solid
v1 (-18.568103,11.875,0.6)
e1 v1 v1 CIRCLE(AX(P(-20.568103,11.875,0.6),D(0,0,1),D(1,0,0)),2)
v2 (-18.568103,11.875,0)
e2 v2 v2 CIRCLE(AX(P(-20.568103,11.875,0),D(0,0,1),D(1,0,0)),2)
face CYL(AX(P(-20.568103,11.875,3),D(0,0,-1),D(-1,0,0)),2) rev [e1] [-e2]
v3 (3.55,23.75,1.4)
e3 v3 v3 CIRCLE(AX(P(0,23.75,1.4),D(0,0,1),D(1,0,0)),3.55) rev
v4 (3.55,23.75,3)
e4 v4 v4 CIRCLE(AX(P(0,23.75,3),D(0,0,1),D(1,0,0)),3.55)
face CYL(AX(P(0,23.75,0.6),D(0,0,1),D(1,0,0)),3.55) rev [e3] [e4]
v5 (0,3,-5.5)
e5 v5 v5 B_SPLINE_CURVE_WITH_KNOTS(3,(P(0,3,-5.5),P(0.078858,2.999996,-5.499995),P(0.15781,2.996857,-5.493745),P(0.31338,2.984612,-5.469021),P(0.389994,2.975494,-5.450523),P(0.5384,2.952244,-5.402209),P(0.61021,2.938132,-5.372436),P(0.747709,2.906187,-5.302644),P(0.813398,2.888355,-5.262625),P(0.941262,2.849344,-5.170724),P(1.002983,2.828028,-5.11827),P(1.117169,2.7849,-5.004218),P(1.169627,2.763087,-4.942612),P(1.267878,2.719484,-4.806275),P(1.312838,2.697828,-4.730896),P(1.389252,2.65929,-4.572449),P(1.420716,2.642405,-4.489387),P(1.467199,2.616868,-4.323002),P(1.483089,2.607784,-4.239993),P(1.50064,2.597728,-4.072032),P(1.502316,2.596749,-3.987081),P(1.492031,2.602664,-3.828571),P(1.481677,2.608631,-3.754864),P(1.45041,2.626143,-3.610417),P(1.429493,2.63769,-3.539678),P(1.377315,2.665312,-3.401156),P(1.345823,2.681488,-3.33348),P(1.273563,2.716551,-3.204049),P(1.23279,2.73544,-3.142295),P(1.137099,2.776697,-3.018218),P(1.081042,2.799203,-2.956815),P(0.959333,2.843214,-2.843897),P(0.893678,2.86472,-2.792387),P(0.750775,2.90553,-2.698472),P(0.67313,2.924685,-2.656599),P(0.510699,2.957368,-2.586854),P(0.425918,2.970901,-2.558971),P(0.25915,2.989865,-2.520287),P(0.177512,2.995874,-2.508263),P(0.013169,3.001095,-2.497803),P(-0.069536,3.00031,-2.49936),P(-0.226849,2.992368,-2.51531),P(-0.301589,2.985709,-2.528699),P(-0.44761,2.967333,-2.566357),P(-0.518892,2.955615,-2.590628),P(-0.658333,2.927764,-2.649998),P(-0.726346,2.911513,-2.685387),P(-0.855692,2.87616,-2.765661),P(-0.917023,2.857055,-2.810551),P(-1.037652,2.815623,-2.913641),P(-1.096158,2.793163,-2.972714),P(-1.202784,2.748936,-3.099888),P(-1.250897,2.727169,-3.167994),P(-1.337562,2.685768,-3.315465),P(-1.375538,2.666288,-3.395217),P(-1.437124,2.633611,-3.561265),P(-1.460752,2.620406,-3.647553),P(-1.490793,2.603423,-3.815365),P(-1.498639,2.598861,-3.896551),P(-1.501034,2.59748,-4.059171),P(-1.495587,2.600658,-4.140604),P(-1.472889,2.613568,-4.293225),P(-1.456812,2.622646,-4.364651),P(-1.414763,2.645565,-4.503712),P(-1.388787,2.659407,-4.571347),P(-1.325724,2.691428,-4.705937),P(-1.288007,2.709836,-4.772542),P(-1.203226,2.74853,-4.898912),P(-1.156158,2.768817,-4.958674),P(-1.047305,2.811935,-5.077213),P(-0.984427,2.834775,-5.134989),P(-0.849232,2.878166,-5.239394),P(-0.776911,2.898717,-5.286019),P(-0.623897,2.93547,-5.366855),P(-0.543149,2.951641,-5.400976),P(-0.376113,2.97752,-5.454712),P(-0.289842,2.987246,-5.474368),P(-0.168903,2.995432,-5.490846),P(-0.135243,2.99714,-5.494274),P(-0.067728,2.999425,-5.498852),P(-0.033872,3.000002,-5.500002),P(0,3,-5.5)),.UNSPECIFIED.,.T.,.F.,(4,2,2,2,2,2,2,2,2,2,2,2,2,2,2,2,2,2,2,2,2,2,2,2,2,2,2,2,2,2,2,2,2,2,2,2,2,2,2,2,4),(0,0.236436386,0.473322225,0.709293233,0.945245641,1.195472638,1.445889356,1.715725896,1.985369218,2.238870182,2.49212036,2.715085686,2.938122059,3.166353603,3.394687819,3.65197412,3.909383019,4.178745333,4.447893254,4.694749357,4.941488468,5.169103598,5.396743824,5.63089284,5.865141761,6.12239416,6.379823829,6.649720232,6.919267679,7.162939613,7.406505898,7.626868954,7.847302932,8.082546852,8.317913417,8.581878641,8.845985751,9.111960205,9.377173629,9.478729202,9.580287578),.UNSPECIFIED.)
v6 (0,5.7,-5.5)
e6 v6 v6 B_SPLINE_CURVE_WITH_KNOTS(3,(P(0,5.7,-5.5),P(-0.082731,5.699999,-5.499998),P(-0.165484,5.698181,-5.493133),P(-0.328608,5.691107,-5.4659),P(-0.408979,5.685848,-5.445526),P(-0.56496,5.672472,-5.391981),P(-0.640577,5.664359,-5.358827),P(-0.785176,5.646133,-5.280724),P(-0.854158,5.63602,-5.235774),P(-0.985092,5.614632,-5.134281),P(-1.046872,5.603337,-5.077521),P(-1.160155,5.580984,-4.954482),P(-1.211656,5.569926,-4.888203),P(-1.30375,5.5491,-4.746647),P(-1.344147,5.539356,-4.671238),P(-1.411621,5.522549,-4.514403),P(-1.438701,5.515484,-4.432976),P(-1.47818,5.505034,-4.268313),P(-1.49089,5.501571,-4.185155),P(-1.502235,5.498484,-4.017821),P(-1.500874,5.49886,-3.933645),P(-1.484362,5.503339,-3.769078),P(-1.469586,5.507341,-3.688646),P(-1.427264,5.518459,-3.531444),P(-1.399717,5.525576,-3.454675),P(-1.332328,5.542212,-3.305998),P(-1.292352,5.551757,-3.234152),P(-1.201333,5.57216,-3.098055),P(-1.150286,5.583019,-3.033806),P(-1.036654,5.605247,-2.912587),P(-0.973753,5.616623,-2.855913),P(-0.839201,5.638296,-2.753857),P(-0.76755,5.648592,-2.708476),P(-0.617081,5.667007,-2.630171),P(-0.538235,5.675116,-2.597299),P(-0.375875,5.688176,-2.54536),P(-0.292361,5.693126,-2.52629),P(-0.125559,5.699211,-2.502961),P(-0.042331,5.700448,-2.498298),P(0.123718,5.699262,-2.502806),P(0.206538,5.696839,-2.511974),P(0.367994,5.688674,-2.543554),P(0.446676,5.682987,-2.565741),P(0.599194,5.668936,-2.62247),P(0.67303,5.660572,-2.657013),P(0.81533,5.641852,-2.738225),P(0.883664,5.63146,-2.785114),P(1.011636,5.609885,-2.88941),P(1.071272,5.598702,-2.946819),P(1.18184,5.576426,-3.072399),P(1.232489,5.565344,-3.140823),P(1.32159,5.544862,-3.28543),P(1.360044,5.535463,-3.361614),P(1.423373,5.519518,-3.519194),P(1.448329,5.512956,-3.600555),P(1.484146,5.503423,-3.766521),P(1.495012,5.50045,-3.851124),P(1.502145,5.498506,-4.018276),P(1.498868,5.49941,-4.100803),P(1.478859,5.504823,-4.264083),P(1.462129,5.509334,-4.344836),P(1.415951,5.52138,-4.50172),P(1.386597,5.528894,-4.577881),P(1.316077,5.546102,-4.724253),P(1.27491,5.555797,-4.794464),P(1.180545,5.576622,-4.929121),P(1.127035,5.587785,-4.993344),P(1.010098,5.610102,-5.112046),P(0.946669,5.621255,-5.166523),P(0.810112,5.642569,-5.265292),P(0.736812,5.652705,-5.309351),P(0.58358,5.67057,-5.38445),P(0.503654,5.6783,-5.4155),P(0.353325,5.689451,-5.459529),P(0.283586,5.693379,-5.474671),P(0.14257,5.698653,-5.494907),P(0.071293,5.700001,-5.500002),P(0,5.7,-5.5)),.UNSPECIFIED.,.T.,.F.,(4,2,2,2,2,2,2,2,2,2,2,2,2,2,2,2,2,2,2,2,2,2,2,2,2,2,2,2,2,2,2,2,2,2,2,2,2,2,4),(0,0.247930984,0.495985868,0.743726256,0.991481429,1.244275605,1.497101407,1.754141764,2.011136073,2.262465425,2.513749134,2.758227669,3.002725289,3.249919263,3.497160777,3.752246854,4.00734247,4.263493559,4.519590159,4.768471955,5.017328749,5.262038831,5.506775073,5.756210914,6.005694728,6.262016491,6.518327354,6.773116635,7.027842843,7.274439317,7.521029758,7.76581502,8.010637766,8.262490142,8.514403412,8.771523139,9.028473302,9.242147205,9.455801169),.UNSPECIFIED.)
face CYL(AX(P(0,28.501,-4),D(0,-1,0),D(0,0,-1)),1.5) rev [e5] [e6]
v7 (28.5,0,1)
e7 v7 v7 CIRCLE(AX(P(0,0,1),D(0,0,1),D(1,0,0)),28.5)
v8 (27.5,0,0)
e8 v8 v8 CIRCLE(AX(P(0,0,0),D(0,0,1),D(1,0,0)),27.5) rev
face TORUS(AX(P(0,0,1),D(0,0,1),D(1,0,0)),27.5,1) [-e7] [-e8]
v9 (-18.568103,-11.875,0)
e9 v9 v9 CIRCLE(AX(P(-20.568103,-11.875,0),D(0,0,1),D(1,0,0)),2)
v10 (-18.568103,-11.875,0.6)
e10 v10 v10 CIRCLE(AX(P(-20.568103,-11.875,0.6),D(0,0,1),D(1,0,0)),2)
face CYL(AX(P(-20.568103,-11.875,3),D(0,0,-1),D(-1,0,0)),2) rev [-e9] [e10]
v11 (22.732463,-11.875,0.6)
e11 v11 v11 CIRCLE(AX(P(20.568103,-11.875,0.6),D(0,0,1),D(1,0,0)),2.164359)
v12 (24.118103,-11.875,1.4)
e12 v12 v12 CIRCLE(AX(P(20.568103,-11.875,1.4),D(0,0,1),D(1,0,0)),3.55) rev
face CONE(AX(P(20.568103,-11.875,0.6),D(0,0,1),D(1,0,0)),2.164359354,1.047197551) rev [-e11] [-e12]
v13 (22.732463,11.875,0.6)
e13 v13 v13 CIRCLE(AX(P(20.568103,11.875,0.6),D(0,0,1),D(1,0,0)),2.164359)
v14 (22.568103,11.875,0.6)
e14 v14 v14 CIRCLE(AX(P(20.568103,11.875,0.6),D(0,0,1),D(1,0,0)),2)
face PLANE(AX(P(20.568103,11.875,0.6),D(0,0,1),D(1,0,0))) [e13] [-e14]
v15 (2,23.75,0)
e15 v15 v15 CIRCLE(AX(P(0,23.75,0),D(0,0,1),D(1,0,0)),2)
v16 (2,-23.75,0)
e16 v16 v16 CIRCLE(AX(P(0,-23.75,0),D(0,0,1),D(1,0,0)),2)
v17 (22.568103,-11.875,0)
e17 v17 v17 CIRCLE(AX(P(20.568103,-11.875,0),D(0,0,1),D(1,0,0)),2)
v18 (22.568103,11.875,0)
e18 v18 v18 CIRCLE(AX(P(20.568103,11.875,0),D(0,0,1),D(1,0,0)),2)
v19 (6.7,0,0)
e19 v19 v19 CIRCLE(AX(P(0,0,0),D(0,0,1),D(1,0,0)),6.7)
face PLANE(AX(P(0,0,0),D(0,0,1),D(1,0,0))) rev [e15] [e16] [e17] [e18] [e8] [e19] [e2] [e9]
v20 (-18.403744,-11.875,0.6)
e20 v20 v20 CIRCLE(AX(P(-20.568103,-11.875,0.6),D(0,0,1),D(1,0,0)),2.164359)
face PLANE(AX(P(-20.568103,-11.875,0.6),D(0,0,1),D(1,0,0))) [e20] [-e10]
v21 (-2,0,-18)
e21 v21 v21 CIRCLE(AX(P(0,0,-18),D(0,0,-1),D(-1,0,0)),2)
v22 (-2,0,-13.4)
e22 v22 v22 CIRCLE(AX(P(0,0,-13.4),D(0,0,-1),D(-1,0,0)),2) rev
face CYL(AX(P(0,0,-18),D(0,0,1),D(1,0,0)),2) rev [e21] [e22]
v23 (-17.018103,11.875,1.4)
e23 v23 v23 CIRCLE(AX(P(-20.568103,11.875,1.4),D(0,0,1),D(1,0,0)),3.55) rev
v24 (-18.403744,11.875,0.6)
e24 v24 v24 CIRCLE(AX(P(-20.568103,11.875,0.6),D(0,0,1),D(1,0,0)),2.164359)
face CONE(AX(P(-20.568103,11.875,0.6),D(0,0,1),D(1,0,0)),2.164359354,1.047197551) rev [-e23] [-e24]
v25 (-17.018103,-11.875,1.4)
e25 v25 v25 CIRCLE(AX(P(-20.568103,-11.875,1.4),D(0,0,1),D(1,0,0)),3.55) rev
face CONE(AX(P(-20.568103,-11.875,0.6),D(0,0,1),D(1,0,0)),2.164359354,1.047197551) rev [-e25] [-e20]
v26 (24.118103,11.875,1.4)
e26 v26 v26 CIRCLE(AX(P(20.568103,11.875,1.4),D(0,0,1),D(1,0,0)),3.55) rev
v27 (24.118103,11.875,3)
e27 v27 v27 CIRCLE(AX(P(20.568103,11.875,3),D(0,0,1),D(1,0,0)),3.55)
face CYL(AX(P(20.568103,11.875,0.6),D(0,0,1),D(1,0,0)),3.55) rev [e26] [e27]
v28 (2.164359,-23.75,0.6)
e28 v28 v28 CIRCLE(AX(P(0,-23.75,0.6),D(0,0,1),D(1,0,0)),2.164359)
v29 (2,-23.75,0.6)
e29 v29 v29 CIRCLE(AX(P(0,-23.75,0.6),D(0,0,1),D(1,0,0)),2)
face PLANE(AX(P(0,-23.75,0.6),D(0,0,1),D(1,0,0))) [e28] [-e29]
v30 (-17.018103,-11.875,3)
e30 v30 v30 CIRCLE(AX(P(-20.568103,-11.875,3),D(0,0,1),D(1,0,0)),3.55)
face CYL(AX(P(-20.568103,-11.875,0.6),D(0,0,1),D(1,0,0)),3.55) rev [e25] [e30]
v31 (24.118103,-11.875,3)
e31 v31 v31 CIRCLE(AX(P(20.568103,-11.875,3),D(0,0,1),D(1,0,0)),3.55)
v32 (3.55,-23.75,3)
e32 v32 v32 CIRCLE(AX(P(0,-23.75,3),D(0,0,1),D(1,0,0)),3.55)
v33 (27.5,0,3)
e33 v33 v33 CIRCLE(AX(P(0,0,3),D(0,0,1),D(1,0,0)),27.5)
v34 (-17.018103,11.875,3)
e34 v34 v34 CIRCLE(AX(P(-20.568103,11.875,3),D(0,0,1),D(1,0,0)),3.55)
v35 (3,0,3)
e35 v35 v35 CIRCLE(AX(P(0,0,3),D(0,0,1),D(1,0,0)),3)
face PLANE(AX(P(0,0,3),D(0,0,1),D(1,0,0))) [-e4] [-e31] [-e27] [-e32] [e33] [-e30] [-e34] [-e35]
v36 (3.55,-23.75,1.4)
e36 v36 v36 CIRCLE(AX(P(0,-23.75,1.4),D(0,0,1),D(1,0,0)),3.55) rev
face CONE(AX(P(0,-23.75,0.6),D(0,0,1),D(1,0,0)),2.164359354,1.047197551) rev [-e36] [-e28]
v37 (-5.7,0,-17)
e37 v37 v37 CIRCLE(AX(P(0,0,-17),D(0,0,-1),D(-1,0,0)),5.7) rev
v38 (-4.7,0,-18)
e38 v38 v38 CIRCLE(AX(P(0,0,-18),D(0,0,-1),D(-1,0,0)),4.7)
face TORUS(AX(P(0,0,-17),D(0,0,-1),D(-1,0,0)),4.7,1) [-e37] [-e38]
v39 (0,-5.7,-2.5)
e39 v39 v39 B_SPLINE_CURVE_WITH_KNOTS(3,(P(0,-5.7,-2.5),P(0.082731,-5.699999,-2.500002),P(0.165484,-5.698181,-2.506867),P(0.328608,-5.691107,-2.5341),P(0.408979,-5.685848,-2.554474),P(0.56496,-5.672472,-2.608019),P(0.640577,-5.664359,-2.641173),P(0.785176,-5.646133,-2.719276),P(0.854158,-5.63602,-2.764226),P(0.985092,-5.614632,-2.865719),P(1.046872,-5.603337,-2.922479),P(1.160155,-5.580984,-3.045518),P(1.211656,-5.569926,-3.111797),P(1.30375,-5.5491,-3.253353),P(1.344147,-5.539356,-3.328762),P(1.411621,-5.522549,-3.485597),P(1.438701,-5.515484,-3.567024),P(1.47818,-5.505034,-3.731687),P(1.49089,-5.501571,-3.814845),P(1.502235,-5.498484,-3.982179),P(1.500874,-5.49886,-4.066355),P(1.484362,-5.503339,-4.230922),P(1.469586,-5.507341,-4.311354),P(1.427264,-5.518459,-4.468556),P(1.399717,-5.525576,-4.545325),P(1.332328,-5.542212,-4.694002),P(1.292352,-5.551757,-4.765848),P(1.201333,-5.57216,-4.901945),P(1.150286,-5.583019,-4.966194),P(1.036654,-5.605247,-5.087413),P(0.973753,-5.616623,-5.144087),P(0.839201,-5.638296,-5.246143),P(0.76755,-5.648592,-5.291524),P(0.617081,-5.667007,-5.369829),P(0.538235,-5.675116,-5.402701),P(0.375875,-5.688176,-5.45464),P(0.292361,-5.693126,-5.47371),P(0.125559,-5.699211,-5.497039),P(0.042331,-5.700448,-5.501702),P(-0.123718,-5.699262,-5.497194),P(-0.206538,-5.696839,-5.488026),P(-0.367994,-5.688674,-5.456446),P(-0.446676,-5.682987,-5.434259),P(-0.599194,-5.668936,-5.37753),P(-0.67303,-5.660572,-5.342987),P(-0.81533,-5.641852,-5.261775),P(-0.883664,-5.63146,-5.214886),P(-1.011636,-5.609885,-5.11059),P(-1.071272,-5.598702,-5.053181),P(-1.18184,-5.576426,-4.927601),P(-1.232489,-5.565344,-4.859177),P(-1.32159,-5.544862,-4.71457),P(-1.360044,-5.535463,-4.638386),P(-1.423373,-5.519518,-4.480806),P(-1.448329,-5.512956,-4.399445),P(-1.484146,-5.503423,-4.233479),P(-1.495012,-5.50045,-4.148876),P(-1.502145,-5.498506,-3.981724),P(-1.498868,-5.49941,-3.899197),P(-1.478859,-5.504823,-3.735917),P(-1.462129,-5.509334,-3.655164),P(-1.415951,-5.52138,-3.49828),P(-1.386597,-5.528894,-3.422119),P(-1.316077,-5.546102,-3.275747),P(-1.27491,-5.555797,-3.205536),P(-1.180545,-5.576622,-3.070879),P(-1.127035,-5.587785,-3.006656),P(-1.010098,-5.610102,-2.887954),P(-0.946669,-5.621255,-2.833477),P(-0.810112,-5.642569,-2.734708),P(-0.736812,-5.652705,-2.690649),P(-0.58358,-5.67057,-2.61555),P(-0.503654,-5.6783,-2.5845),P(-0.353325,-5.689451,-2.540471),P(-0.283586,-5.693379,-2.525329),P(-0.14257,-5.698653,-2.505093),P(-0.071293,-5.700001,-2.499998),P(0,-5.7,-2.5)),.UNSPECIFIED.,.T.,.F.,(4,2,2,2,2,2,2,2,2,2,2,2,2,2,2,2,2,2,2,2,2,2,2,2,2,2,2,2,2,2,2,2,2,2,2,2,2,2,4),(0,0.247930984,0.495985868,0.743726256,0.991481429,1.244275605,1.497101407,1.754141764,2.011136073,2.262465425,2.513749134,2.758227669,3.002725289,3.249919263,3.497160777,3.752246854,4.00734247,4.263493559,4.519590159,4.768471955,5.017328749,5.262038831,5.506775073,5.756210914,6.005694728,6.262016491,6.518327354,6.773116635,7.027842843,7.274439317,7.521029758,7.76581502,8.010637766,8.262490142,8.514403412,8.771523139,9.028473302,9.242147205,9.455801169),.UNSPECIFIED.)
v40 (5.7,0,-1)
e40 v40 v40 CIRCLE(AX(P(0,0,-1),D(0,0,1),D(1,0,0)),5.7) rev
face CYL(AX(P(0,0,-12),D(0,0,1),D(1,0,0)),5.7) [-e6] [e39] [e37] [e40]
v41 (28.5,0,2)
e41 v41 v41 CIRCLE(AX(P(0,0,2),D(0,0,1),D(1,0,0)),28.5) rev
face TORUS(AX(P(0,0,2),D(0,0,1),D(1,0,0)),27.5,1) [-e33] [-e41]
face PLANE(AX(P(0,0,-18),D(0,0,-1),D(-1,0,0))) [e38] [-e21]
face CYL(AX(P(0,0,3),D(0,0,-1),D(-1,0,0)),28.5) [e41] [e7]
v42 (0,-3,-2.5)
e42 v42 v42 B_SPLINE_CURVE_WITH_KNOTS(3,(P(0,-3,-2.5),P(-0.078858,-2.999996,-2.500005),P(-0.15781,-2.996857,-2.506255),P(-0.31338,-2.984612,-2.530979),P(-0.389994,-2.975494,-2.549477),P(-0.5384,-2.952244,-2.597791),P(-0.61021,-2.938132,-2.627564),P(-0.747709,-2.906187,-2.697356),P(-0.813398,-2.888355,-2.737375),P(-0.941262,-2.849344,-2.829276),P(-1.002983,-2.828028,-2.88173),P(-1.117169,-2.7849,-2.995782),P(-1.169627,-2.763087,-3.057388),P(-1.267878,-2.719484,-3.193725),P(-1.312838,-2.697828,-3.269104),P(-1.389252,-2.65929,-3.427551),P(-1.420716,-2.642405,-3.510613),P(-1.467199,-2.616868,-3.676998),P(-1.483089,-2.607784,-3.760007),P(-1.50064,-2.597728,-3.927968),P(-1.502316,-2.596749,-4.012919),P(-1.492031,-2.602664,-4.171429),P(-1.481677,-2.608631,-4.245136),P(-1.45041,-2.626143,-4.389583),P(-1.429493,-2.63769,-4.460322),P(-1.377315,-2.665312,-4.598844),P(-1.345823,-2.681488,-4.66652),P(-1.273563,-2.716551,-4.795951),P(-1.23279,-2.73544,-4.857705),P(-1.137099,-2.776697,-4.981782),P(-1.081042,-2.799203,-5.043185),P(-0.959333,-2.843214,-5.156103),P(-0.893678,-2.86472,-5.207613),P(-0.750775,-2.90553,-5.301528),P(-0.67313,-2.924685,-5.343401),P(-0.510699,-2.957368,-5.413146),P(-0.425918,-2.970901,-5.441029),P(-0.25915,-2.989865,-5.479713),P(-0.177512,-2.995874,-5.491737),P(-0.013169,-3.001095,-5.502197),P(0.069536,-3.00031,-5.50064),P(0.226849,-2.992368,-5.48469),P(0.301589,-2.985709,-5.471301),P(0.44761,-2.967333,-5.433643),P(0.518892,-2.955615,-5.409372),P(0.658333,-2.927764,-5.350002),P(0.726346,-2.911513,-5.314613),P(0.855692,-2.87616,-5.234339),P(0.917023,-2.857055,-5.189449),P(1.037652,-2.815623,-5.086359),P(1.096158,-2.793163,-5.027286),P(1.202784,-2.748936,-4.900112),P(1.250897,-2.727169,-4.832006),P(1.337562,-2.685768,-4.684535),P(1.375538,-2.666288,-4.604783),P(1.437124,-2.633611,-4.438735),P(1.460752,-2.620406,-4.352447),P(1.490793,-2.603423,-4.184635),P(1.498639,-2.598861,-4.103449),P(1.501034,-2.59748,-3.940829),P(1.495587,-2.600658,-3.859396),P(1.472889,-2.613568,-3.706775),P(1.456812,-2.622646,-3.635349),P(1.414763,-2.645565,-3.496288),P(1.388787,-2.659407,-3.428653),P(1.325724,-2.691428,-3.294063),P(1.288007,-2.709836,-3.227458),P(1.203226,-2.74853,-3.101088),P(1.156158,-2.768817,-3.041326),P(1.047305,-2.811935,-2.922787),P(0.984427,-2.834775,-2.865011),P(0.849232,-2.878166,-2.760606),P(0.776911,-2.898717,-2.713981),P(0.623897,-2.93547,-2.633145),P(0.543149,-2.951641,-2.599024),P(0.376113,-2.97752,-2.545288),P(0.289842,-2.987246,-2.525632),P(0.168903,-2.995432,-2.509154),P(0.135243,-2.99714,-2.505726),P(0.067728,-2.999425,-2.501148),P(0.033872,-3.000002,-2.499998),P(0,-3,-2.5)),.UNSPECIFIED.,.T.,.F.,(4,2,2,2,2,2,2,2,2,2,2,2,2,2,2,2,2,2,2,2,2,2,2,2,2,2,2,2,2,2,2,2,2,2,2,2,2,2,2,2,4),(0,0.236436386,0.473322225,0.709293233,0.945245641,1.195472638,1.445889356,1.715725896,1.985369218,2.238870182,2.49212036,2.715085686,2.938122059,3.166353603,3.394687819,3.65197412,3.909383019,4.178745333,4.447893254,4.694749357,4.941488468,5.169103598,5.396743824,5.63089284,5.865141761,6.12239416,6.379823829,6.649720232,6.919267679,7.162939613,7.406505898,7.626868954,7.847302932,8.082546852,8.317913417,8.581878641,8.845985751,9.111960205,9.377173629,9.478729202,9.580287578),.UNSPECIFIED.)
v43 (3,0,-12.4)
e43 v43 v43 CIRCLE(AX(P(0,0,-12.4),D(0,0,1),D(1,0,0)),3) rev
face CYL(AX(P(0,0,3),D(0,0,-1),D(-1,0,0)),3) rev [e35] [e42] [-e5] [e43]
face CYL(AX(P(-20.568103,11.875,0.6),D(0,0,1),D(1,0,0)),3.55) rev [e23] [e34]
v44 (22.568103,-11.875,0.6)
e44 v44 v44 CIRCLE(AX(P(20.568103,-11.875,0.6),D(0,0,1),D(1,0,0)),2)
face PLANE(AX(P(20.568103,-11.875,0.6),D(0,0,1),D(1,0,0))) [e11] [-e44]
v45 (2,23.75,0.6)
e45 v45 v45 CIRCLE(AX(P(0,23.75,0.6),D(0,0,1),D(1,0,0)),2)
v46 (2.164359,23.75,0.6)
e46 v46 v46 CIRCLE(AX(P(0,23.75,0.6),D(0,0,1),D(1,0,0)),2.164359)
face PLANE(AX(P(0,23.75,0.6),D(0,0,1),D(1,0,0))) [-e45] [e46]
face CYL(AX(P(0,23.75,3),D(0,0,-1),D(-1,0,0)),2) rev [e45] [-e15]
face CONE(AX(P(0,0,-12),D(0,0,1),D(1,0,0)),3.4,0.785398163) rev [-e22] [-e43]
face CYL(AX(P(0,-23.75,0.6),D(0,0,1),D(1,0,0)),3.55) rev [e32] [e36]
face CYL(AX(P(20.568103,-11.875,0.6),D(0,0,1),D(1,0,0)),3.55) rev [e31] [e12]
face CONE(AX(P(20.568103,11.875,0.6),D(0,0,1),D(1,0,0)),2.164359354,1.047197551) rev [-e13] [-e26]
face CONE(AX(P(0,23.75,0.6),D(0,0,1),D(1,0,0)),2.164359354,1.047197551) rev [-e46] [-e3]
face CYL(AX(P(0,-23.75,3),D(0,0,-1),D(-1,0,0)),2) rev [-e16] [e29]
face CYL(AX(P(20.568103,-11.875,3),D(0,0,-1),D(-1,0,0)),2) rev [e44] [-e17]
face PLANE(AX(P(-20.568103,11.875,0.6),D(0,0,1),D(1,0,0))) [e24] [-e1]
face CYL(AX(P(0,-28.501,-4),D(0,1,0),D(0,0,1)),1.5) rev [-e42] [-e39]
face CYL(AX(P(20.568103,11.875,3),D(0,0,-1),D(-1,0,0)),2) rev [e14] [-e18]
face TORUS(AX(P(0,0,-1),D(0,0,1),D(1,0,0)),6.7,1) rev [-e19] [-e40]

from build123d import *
from OCP.BRepFilletAPI import BRepFilletAPI_MakeChamfer

# Parameters (mm, degrees)
SKETCH1_R                      = 28.5
SKETCH1_R_2                    = 5.7
SKETCH1_R_3                    = 2
SKETCH1_R_4                    = 3
BOSS_EXTRUDE1_DEPTH            = 3
SKETCH2_R                      = 3.55
CUT_EXTRUDE1_DEPTH             = 2.4
BOSS_EXTRUDE2_START            = -12
SKETCH1_4_R                    = 5.7
SKETCH1_4_R_2                  = 3
BOSS_EXTRUDE2_DEPTH            = 12
BOSS_EXTRUDE3_START            = 6
SKETCH4_R                      = 5.7
SKETCH4_R_2                    = 2
BOSS_EXTRUDE3_DEPTH            = 6
CUT_EXTRUDE2_REACH             = 46.142
SKETCH3_R                      = 1.5
CUT_EXTRUDE2_DIRECTION_2_REACH = 46.142
FILLET1_R                      = 1
CHAMFER1_SIZE                  = 1.4
CHAMFER2_SIZE                  = 0.8
CHAMFER2_SIZE2                 = 1.385640646


with BuildPart() as part:
    # Sketch1 → Boss-Extrude1 (new body)
    # profile 1 of 2: a face of its own
    with BuildSketch(Plane(origin=(0, 0, 0), x_dir=(0, 1, 0), z_dir=(0, 0, 1))):
        with Locations(Location((0, 0, 0), (0, 0, 270))):
            Circle(SKETCH1_R)
        Circle(SKETCH1_R_2, mode=Mode.SUBTRACT)
        with Locations(Location((-23.75, 0, 0), (0, 0, 270))):
            Circle(SKETCH1_R_3, mode=Mode.SUBTRACT)
        with Locations(Location((-11.875, 20.56810334, 0), (0, 0, 270))):
            Circle(SKETCH1_R_3, mode=Mode.SUBTRACT)
        with Locations(Location((11.875, 20.56810334, 0), (0, 0, 270))):
            Circle(SKETCH1_R_3, mode=Mode.SUBTRACT)
        with Locations(Location((23.75, 0, 0), (0, 0, 270))):
            Circle(SKETCH1_R_3, mode=Mode.SUBTRACT)
        with Locations(Location((11.875, -20.56810334, 0), (0, 0, 270))):
            Circle(SKETCH1_R_3, mode=Mode.SUBTRACT)
        with Locations(Location((-11.875, -20.56810334, 0), (0, 0, 270))):
            Circle(SKETCH1_R_3, mode=Mode.SUBTRACT)
    # profile 2 of 2: a face of its own
    with BuildSketch(Plane(origin=(0, 0, 0), x_dir=(0, 1, 0), z_dir=(0, 0, 1))):
        Circle(SKETCH1_R_2)
        with Locations(Location((0, 0, 0), (0, 0, 270))):
            Circle(SKETCH1_R_4, mode=Mode.SUBTRACT)
    extrude(amount=BOSS_EXTRUDE1_DEPTH)

    # Sketch2 → Cut-Extrude1 (cut)
    with BuildSketch(Plane.XY.offset(3)):
        with Locations((-20.56810334, -11.875)):
            Circle(SKETCH2_R)
        with Locations((-20.56810334, 11.875)):
            Circle(SKETCH2_R)
        with Locations((0, 23.75)):
            Circle(SKETCH2_R)
        with Locations((20.56810334, 11.875)):
            Circle(SKETCH2_R)
        with Locations((20.56810334, -11.875)):
            Circle(SKETCH2_R)
        with Locations((0, -23.75)):
            Circle(SKETCH2_R)
    extrude(amount=-CUT_EXTRUDE1_DEPTH, mode=Mode.SUBTRACT)

    # Sketch1<4> → Boss-Extrude2 (add)
    with BuildSketch(Plane(origin=(0, 0, 0), x_dir=(0, 1, 0), z_dir=(0, 0, 1)).offset(BOSS_EXTRUDE2_START)):
        with Locations(Location((0, 0, 0), (0, 0, 270))):
            Circle(SKETCH1_4_R)
        with Locations(Location((0, 0, 0), (0, 0, 270))):
            Circle(SKETCH1_4_R_2, mode=Mode.SUBTRACT)
    extrude(amount=BOSS_EXTRUDE2_DEPTH)

    # Sketch4 → Boss-Extrude3 (add)
    with BuildSketch(Plane(origin=(0, 0, -12), x_dir=(1, 0, 0), z_dir=(0, 0, -1)).offset(BOSS_EXTRUDE3_START)):
        Circle(SKETCH4_R)
        with Locations(Location((0, 0, 0), (0, 0, 180))):
            Circle(SKETCH4_R_2, mode=Mode.SUBTRACT)
    extrude(amount=-BOSS_EXTRUDE3_DEPTH)

    # Sketch3 → Cut-Extrude2 (cut, up to next)
    with BuildSketch(Plane(origin=(0, 0, 0), x_dir=(-1, 0, 0), z_dir=(0, 1, 0)), mode=Mode.PRIVATE) as cut_extrude2_sk1:
        with Locations(Location((0, -4, 0), (0, 0, 90))):
            Circle(SKETCH3_R)
    cut_extrude2_tool1 = extrude(cut_extrude2_sk1.sketch, amount=-CUT_EXTRUDE2_REACH, mode=Mode.PRIVATE) & part.part
    add(cut_extrude2_tool1.solids().sort_by_distance((0, 0, -4))[0], mode=Mode.SUBTRACT)

    # Sketch3 → Cut-Extrude2 direction 2 (cut, up to next)
    with BuildSketch(Plane(origin=(0, 0, 0), x_dir=(-1, 0, 0), z_dir=(0, 1, 0)), mode=Mode.PRIVATE) as cut_extrude2_direction_2_sk1:
        with Locations(Location((0, -4, 0), (0, 0, 90))):
            Circle(SKETCH3_R)
    cut_extrude2_direction_2_tool1 = extrude(cut_extrude2_direction_2_sk1.sketch, amount=CUT_EXTRUDE2_DIRECTION_2_REACH, mode=Mode.PRIVATE) & part.part
    add(cut_extrude2_direction_2_tool1.solids().sort_by_distance((0, 0, -4))[0], mode=Mode.SUBTRACT)

    # Fillet1
    fillet1_edges = [part.edges().sort_by_distance(p)[0] for p in [
        (-28.5, 0, 0),
        (-28.5, 0, 3),
        (-5.7, 0, 0),
        (-5.7, 0, -18),
    ]]
    fillet(fillet1_edges, radius=FILLET1_R)

    # Chamfer1
    # the kernel refuses this chamfer: 1.4 mm, written as the material it takes off along each edge
    with BuildSketch(Plane(origin=(0, 0, -12), x_dir=(-1, 0, 0), z_dir=(0, -1, 0))) as chamfer1_piece_1_section:
        Polygon((2 + CHAMFER1_SIZE, 0), (2, CHAMFER1_SIZE), (2, 0), align=None)
    chamfer1_piece_1 = revolve(axis=Axis((0, 0, -12), (0, 0, -1)), mode=Mode.PRIVATE)
    chamfer1_piece_1 = chamfer1_piece_1 & Plane(origin=(0, 0, -12.902493822), x_dir=(1, 0, 0), z_dir=(0, 0, -1)) * Cylinder(3, 14, mode=Mode.PRIVATE)
    add(chamfer1_piece_1, mode=Mode.SUBTRACT)

    # Chamfer2: one chamfer whose edges measure the first distance from different faces: ONE call of the kernel's chamfer builder (chamfer() names one face for all edges)
    chamfer2_edges_1 = [part.edges().sort_by_distance(p)[0] for p in [
        (-3.55, -23.75, 0.6),
    ]]
    chamfer2_side_1 = [part.faces().sort_by_distance(p)[0] for p in [
        (-3.55, -23.75, 1.8),
    ]]
    chamfer2_edges_2 = [part.edges().sort_by_distance(p)[0] for p in [
        (17.01810334, -11.875, 0.6),
    ]]
    chamfer2_side_2 = [part.faces().sort_by_distance(p)[0] for p in [
        (17.01810334, -11.875, 1.8),
    ]]
    chamfer2_edges_3 = [part.edges().sort_by_distance(p)[0] for p in [
        (17.01810334, 11.875, 0.6),
    ]]
    chamfer2_side_3 = [part.faces().sort_by_distance(p)[0] for p in [
        (17.01810334, 11.875, 1.8),
    ]]
    chamfer2_edges_4 = [part.edges().sort_by_distance(p)[0] for p in [
        (-3.55, 23.75, 0.6),
    ]]
    chamfer2_side_4 = [part.faces().sort_by_distance(p)[0] for p in [
        (-3.55, 23.75, 1.8),
    ]]
    chamfer2_edges_5 = [part.edges().sort_by_distance(p)[0] for p in [
        (-24.11810334, 11.875, 0.6),
    ]]
    chamfer2_side_5 = [part.faces().sort_by_distance(p)[0] for p in [
        (-24.11810334, 11.875, 1.8),
    ]]
    chamfer2_edges_6 = [part.edges().sort_by_distance(p)[0] for p in [
        (-24.11810334, -11.875, 0.6),
    ]]
    chamfer2_side_6 = [part.faces().sort_by_distance(p)[0] for p in [
        (-24.11810334, -11.875, 1.8),
    ]]
    chamfer2 = BRepFilletAPI_MakeChamfer(part.part.solid().wrapped)
    for e in chamfer2_edges_1:
        chamfer2.Add(CHAMFER2_SIZE, CHAMFER2_SIZE2, e.wrapped, chamfer2_side_1[0].wrapped)  # the first distance lies on this face
    for e in chamfer2_edges_2:
        chamfer2.Add(CHAMFER2_SIZE, CHAMFER2_SIZE2, e.wrapped, chamfer2_side_2[0].wrapped)  # the first distance lies on this face
    for e in chamfer2_edges_3:
        chamfer2.Add(CHAMFER2_SIZE, CHAMFER2_SIZE2, e.wrapped, chamfer2_side_3[0].wrapped)  # the first distance lies on this face
    for e in chamfer2_edges_4:
        chamfer2.Add(CHAMFER2_SIZE, CHAMFER2_SIZE2, e.wrapped, chamfer2_side_4[0].wrapped)  # the first distance lies on this face
    for e in chamfer2_edges_5:
        chamfer2.Add(CHAMFER2_SIZE, CHAMFER2_SIZE2, e.wrapped, chamfer2_side_5[0].wrapped)  # the first distance lies on this face
    for e in chamfer2_edges_6:
        chamfer2.Add(CHAMFER2_SIZE, CHAMFER2_SIZE2, e.wrapped, chamfer2_side_6[0].wrapped)  # the first distance lies on this face
    add(Compound.cast(chamfer2.Shape()), mode=Mode.REPLACE)


solid = part.part
